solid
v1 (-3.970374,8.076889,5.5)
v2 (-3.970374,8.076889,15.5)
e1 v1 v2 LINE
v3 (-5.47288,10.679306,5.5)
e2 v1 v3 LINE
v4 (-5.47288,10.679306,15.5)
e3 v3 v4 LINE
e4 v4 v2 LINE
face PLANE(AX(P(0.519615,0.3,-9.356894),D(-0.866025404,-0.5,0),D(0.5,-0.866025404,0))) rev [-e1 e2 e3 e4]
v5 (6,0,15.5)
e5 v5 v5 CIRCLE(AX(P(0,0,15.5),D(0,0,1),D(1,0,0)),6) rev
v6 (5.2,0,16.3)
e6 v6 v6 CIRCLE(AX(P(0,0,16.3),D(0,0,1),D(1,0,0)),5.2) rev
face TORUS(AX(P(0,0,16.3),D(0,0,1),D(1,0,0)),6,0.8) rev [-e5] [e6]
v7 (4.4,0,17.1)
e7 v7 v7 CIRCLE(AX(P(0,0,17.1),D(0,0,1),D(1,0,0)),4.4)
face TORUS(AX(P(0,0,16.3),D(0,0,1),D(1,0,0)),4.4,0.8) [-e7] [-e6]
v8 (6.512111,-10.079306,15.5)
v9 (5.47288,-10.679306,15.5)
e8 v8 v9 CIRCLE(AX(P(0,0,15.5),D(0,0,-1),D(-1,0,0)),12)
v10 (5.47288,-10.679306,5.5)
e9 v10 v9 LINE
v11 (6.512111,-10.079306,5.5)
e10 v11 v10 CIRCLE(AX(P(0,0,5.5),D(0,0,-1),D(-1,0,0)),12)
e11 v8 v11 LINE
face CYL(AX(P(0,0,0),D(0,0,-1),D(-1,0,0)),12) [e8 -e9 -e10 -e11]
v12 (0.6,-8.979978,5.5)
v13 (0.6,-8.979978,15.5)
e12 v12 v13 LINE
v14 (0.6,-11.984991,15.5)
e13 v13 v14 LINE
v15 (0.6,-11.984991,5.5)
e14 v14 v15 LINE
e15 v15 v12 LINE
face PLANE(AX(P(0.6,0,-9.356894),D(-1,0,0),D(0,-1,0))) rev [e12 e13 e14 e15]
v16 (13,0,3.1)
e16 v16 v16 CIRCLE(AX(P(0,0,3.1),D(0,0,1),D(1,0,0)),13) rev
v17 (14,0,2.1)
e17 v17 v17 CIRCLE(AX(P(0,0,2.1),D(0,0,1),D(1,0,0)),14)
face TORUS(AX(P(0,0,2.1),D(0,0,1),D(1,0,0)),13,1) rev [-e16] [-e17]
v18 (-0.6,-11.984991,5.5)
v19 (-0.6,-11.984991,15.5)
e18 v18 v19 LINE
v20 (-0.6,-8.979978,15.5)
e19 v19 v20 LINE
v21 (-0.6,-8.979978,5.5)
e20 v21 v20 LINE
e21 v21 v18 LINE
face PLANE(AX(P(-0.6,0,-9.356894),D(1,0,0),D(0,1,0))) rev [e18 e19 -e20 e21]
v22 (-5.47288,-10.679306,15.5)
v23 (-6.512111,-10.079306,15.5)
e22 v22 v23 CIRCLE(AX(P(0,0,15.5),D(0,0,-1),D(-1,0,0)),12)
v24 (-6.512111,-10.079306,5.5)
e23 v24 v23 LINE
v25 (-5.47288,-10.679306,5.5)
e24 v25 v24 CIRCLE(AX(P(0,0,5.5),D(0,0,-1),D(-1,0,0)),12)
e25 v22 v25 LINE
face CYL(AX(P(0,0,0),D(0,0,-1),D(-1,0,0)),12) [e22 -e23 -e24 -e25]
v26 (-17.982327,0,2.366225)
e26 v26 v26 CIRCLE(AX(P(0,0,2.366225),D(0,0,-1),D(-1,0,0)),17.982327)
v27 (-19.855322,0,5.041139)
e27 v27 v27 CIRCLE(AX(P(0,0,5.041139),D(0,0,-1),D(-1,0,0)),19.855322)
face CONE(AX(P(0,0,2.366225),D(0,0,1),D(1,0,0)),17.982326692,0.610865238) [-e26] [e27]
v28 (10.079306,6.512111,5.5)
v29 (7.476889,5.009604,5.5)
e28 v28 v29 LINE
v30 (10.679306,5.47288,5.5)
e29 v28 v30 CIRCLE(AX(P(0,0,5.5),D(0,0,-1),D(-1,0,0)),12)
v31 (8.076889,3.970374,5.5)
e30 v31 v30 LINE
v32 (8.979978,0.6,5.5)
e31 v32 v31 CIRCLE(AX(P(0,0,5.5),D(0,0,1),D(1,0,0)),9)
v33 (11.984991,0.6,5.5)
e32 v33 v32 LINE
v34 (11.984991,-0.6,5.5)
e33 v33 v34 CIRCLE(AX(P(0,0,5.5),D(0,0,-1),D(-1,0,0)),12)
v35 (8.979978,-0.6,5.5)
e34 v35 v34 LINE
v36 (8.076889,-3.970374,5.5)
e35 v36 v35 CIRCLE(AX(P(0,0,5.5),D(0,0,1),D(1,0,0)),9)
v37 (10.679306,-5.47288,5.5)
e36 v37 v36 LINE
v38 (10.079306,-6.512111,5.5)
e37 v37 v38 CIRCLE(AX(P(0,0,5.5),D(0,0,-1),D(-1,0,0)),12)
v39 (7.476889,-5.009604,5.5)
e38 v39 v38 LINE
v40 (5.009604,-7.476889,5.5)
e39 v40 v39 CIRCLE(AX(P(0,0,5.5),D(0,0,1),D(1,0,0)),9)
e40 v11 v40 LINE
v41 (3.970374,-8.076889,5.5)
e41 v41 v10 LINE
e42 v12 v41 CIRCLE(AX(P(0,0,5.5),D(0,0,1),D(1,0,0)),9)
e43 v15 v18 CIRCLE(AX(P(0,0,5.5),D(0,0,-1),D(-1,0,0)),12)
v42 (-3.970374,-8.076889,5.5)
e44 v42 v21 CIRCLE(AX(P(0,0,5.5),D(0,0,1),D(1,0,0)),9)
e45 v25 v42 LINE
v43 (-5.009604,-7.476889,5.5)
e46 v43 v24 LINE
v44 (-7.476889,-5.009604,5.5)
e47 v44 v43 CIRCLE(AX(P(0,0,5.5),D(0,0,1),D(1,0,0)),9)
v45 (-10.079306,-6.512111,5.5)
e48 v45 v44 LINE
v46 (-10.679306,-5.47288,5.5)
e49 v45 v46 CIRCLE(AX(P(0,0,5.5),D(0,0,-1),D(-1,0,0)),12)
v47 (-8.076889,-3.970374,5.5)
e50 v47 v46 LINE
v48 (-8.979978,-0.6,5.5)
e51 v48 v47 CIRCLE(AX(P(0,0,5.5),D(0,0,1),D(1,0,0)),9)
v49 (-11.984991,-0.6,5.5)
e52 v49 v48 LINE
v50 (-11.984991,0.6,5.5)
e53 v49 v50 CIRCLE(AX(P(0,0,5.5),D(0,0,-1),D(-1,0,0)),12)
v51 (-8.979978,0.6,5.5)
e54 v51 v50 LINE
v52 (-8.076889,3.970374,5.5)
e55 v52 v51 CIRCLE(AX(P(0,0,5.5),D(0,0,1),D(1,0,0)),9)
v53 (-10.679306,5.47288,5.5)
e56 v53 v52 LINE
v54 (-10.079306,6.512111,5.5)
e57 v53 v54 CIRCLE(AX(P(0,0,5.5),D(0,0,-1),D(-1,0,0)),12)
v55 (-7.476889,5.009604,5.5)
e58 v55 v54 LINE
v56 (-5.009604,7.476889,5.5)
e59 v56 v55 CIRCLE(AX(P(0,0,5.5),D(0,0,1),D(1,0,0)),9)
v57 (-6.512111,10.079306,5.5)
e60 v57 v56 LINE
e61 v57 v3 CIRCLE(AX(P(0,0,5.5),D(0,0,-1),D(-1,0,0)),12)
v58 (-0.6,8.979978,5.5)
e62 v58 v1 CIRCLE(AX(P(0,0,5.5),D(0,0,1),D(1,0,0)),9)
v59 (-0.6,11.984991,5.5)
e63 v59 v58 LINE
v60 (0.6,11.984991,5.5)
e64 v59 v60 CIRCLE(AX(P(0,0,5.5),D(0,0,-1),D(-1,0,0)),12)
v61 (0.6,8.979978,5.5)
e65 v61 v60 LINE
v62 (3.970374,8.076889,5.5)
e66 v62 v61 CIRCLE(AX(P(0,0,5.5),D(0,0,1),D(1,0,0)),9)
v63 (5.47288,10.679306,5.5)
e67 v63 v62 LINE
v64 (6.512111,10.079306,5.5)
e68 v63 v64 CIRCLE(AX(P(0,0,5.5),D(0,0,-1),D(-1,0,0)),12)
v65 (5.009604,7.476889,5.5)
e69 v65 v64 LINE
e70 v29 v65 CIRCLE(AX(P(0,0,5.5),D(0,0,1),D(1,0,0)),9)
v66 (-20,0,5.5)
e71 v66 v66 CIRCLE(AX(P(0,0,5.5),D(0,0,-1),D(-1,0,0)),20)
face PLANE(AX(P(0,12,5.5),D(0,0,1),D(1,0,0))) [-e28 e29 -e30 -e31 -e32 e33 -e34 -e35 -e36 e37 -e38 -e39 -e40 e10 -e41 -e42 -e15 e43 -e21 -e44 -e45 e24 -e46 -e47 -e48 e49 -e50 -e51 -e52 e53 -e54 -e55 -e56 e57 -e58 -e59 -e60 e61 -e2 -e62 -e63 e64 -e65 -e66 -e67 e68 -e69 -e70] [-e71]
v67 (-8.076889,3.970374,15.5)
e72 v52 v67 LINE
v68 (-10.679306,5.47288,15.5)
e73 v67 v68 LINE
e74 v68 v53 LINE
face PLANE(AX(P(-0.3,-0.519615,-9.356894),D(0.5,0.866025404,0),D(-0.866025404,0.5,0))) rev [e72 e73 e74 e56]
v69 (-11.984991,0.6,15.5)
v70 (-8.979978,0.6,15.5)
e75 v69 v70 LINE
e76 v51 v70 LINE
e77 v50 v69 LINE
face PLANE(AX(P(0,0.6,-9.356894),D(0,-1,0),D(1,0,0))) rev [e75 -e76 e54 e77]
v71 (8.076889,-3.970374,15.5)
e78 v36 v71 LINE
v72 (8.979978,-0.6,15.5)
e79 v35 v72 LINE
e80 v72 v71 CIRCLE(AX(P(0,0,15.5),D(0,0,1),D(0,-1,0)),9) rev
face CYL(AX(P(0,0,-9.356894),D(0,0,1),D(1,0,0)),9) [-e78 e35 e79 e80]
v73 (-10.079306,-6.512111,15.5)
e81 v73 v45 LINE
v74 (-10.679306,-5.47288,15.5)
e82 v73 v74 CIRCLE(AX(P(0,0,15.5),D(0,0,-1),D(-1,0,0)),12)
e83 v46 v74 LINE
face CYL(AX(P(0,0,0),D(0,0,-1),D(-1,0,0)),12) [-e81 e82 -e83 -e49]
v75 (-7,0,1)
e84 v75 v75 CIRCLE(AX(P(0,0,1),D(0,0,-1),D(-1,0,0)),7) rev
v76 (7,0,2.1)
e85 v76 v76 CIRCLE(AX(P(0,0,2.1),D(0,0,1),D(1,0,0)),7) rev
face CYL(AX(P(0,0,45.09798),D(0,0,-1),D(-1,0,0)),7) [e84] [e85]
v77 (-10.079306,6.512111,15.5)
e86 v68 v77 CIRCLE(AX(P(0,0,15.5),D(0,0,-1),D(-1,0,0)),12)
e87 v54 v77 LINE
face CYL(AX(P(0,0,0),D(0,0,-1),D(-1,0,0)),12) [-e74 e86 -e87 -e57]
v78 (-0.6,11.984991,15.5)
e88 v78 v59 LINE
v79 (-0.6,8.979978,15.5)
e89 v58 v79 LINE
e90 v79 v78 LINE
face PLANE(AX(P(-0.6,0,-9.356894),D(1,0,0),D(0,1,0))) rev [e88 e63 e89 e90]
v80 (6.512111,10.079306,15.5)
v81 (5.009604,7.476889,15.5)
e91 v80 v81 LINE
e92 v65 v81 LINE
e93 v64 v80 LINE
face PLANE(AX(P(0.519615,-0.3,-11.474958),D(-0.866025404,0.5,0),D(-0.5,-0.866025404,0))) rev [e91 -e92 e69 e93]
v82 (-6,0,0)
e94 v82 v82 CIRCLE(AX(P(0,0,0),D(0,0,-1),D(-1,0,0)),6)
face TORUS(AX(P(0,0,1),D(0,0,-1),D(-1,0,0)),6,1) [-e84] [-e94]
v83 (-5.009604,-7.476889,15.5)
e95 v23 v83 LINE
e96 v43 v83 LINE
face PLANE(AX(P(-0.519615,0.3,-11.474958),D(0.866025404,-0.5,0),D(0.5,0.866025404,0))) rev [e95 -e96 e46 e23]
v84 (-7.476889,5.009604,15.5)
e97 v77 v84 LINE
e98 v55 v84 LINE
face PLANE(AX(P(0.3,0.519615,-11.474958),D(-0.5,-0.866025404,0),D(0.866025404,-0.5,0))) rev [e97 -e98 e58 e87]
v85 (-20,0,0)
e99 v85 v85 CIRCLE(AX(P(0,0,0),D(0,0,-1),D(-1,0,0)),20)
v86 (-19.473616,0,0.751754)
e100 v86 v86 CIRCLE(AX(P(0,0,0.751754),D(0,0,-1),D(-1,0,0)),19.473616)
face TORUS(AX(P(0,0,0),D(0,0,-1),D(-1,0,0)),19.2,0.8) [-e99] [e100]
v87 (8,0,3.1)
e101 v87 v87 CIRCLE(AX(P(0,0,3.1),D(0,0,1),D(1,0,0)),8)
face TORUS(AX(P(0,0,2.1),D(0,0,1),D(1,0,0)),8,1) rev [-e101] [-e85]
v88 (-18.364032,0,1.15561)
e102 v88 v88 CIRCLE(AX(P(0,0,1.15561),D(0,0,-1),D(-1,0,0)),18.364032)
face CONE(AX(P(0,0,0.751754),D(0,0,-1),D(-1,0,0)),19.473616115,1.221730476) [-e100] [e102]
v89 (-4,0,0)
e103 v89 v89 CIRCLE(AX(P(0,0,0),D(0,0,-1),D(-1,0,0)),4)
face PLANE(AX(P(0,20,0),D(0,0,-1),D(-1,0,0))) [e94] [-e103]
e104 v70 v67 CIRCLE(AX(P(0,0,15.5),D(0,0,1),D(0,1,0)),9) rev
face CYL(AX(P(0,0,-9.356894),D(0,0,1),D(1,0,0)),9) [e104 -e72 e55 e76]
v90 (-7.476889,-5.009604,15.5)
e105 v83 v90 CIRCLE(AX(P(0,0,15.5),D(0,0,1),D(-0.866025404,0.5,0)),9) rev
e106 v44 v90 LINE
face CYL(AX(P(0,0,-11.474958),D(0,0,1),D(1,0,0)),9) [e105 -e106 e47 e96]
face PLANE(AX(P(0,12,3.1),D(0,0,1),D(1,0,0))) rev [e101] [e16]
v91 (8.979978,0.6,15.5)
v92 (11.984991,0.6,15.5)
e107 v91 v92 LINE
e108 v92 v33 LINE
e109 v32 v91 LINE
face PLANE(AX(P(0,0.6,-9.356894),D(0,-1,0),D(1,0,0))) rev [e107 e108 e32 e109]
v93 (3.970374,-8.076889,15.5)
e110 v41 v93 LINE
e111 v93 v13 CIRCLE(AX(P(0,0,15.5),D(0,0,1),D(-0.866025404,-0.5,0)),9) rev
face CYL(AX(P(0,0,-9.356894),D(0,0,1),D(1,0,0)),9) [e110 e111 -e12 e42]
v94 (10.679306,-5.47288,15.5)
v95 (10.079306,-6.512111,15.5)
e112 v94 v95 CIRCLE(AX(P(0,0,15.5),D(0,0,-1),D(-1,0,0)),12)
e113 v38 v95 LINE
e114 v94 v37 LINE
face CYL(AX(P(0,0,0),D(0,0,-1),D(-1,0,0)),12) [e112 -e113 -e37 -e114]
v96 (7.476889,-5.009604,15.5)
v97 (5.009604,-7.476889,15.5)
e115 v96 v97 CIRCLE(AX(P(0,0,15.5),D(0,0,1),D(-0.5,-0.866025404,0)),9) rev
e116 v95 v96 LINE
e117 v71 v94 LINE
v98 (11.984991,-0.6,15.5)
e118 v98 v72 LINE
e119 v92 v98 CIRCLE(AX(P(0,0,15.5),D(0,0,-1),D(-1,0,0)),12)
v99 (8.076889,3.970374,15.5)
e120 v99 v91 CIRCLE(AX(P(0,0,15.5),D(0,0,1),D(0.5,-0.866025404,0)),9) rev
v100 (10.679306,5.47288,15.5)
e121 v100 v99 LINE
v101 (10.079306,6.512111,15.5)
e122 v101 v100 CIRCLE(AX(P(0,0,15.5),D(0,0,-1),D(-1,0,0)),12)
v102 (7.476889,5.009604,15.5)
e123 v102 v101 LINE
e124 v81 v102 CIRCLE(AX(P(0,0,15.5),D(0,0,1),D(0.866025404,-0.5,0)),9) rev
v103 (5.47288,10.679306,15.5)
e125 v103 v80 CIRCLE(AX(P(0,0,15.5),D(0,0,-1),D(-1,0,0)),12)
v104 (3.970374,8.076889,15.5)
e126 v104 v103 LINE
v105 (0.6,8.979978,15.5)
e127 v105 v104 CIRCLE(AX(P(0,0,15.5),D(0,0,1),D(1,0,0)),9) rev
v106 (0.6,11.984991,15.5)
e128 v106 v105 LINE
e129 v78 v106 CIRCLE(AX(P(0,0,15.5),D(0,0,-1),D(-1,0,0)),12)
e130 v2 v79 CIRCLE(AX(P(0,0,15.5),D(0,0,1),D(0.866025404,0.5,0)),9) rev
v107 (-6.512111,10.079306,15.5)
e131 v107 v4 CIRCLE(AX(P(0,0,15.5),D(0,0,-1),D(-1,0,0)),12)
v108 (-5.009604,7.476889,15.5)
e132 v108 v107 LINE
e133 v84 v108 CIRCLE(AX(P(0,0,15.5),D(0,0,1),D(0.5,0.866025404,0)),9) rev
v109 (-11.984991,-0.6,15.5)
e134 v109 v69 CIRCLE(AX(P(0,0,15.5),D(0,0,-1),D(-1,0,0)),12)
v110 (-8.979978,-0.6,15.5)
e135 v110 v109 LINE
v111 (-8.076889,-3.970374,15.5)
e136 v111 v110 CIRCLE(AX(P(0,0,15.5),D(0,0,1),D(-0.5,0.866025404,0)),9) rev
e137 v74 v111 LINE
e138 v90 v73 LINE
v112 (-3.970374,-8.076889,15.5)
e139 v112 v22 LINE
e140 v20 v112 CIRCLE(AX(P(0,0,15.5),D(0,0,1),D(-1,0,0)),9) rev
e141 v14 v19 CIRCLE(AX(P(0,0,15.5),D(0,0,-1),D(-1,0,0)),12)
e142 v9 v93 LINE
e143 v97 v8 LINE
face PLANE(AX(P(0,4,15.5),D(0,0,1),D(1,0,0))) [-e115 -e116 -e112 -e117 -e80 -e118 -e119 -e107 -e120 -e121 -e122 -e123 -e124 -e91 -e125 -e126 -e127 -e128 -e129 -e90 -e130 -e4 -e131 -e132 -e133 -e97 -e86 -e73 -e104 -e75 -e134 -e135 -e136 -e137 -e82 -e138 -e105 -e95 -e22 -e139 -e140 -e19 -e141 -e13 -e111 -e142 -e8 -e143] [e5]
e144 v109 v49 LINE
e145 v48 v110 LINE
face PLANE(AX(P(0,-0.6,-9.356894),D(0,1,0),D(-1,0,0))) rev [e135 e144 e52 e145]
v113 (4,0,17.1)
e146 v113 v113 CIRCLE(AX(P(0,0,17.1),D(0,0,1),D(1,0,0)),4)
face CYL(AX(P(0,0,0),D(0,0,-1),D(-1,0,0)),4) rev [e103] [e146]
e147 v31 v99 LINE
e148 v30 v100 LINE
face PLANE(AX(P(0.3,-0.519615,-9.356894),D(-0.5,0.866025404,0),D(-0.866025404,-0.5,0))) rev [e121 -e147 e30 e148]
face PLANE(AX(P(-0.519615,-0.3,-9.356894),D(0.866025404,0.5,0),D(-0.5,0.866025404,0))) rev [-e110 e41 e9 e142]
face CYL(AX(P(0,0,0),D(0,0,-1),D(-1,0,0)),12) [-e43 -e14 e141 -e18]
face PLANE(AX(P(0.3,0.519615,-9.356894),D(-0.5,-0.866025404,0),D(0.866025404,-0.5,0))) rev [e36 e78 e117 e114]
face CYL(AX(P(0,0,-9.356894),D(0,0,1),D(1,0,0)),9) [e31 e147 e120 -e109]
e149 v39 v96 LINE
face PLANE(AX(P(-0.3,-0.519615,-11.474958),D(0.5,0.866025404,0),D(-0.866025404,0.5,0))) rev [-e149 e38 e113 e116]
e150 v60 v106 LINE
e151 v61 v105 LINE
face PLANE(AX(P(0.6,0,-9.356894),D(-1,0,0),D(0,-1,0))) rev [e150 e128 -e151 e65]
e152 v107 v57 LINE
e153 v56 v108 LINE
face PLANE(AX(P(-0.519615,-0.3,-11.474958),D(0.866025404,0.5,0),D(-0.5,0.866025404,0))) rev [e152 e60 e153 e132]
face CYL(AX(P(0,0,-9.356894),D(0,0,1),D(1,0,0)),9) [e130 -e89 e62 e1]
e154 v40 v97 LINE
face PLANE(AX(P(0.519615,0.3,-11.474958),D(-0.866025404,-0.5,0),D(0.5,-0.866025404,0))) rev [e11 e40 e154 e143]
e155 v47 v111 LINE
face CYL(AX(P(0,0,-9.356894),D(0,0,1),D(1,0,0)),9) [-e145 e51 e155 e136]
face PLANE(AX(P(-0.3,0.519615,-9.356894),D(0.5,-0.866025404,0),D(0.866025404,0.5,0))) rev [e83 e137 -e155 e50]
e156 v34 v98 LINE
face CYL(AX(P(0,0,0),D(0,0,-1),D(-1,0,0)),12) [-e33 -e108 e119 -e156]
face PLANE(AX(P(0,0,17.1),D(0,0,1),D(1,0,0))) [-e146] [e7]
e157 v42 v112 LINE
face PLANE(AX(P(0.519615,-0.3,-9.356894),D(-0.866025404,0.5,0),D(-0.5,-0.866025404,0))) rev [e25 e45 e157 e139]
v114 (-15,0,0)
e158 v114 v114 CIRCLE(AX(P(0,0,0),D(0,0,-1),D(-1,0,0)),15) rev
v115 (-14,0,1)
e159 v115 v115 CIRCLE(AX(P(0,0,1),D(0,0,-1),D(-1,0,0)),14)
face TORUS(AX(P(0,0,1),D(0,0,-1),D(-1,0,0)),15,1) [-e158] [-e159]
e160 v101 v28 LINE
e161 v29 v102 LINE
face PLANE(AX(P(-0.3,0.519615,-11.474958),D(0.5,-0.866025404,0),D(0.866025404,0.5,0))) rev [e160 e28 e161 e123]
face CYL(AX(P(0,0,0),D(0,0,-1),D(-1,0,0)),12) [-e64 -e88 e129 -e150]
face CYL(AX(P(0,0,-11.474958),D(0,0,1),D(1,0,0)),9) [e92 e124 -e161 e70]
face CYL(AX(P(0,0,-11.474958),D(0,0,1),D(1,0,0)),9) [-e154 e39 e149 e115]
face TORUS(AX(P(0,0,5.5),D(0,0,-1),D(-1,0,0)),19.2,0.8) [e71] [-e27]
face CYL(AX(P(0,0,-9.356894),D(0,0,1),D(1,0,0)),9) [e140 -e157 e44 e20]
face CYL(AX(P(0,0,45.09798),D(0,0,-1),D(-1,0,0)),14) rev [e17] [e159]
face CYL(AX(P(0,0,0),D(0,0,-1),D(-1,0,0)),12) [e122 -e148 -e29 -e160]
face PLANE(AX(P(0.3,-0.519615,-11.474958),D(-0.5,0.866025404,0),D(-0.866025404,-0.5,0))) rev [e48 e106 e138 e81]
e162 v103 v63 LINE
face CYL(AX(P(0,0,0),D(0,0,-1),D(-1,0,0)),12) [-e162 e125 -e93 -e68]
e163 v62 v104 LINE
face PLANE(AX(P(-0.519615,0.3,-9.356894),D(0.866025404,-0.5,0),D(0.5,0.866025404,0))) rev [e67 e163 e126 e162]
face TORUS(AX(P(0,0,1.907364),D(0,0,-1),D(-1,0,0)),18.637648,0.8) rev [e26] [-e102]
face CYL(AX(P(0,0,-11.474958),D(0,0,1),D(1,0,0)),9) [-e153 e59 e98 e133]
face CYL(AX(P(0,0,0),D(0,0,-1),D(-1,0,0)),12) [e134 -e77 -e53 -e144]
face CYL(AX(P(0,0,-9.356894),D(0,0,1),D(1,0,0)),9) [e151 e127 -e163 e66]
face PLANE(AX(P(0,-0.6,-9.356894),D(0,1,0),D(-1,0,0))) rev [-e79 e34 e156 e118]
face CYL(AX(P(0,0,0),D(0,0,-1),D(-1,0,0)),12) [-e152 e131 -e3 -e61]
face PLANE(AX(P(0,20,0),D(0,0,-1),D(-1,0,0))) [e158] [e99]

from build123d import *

# Parameters (mm, degrees)
CUT_EXTRUDE1_START  = -10
CUT_EXTRUDE1_DEPTH  = 10
CIRPATTERN1_COUNT   = 12
SKETCH4_R           = 14
SKETCH4_R_2         = 7
CUT_EXTRUDE2_DEPTH  = 3.1
FILLET1_R           = 1
BOSS_EXTRUDE1_START = 1.6
SKETCH5_R           = 5.2
SKETCH5_R_2         = 4
BOSS_EXTRUDE1_DEPTH = 1.6
FILLET2_R           = 0.8


with BuildPart() as part:
    # Sketch2 → Revolve1 (revolve)
    with BuildSketch(Plane(origin=(0, 0, 0), x_dir=(0, 0, -1), z_dir=(1, 0, 0)), mode=Mode.PRIVATE) as revolve1_sk:
        with BuildLine():
            Line((0, 4), (-15.5, 4))
            Line((-15.5, 4), (-15.5, 12))
            Line((-15.5, 12), (-5.5, 12))
            Line((-5.5, 12), (-5.5, 20))
            ThreePointArc((-5.5, 20), (-5.25943536, 19.962973561), (-5.041138851, 19.855321635))
            Line((-5.041138851, 19.855321635), (-2.366224855, 17.982326692))
            ThreePointArc((-2.366224855, 17.982326692), (-1.666799067, 17.874674766), (-1.155609609, 18.364032212))
            Line((-1.155609609, 18.364032212), (-0.751754097, 19.473616115))
            ThreePointArc((-0.751754097, 19.473616115), (-0.458861149, 19.855321635), (0, 20))
            Line((0, 20), (0, 4))
        make_face()
    revolve(revolve1_sk.sketch.rotate(Axis((0, 0, 0), (0, 0, 1)), 90), axis=Axis((0, 0, 0), (0, 0, 1)))

    # Sketch3 → Cut-Extrude1 (cut)
    with BuildSketch(Plane.XY.offset(15.5).offset(CUT_EXTRUDE1_START)):
        with BuildLine():
            ThreePointArc((5.472880064, 10.679306335), (3.105828541, 11.591109915), (0.6, 11.984990613))
            Line((0.6, 11.984990613), (0.6, 8.979977728))
            ThreePointArc((0.6, 8.979977728), (2.329371406, 8.693332437), (3.970373622, 8.076888838))
            Line((3.970373622, 8.076888838), (5.472880064, 10.679306335))
        make_face()
    cut_extrude1 = extrude(amount=CUT_EXTRUDE1_DEPTH, mode=Mode.SUBTRACT)

    # CirPattern1: Cut-Extrude1 ×12 about axis
    cirpattern1_axis = Axis((0, 0, 0), (0, 0, 1))
    for i in range(1, CIRPATTERN1_COUNT):
        add(cut_extrude1.rotate(cirpattern1_axis, i * 360 / CIRPATTERN1_COUNT), mode=Mode.SUBTRACT)

    # Sketch4 → Cut-Extrude2 (cut)
    with BuildSketch(Plane(origin=(0, 0, 0), x_dir=(-1, 0, 0), z_dir=(0, 0, -1))):
        Circle(SKETCH4_R)
        Circle(SKETCH4_R_2, mode=Mode.SUBTRACT)
    extrude(amount=-CUT_EXTRUDE2_DEPTH, mode=Mode.SUBTRACT)

    # Fillet1
    fillet1_edges = [part.edges().sort_by_distance(p)[0] for p in [
        (14, 0, 3.1),
        (7, 0, 0),
        (14, 0, 0),
        (7, 0, 3.1),
    ]]
    fillet(fillet1_edges, radius=FILLET1_R)

    # Sketch5 → Boss-Extrude1 (add)
    with BuildSketch(Plane.XY.offset(15.5).offset(BOSS_EXTRUDE1_START)):
        Circle(SKETCH5_R)
        with Locations(Location((0, 0, 0), (0, 0, 180))):
            Circle(SKETCH5_R_2, mode=Mode.SUBTRACT)
    extrude(amount=-BOSS_EXTRUDE1_DEPTH)

    # Fillet2
    fillet2_edges = [part.edges().sort_by_distance(p)[0] for p in [
        (-5.2, 0, 17.1),
        (-5.2, 0, 15.5),
    ]]
    fillet(fillet2_edges, radius=FILLET2_R - 0.0001)  # a hair under: the kernel refuses the full size


solid = part.part
